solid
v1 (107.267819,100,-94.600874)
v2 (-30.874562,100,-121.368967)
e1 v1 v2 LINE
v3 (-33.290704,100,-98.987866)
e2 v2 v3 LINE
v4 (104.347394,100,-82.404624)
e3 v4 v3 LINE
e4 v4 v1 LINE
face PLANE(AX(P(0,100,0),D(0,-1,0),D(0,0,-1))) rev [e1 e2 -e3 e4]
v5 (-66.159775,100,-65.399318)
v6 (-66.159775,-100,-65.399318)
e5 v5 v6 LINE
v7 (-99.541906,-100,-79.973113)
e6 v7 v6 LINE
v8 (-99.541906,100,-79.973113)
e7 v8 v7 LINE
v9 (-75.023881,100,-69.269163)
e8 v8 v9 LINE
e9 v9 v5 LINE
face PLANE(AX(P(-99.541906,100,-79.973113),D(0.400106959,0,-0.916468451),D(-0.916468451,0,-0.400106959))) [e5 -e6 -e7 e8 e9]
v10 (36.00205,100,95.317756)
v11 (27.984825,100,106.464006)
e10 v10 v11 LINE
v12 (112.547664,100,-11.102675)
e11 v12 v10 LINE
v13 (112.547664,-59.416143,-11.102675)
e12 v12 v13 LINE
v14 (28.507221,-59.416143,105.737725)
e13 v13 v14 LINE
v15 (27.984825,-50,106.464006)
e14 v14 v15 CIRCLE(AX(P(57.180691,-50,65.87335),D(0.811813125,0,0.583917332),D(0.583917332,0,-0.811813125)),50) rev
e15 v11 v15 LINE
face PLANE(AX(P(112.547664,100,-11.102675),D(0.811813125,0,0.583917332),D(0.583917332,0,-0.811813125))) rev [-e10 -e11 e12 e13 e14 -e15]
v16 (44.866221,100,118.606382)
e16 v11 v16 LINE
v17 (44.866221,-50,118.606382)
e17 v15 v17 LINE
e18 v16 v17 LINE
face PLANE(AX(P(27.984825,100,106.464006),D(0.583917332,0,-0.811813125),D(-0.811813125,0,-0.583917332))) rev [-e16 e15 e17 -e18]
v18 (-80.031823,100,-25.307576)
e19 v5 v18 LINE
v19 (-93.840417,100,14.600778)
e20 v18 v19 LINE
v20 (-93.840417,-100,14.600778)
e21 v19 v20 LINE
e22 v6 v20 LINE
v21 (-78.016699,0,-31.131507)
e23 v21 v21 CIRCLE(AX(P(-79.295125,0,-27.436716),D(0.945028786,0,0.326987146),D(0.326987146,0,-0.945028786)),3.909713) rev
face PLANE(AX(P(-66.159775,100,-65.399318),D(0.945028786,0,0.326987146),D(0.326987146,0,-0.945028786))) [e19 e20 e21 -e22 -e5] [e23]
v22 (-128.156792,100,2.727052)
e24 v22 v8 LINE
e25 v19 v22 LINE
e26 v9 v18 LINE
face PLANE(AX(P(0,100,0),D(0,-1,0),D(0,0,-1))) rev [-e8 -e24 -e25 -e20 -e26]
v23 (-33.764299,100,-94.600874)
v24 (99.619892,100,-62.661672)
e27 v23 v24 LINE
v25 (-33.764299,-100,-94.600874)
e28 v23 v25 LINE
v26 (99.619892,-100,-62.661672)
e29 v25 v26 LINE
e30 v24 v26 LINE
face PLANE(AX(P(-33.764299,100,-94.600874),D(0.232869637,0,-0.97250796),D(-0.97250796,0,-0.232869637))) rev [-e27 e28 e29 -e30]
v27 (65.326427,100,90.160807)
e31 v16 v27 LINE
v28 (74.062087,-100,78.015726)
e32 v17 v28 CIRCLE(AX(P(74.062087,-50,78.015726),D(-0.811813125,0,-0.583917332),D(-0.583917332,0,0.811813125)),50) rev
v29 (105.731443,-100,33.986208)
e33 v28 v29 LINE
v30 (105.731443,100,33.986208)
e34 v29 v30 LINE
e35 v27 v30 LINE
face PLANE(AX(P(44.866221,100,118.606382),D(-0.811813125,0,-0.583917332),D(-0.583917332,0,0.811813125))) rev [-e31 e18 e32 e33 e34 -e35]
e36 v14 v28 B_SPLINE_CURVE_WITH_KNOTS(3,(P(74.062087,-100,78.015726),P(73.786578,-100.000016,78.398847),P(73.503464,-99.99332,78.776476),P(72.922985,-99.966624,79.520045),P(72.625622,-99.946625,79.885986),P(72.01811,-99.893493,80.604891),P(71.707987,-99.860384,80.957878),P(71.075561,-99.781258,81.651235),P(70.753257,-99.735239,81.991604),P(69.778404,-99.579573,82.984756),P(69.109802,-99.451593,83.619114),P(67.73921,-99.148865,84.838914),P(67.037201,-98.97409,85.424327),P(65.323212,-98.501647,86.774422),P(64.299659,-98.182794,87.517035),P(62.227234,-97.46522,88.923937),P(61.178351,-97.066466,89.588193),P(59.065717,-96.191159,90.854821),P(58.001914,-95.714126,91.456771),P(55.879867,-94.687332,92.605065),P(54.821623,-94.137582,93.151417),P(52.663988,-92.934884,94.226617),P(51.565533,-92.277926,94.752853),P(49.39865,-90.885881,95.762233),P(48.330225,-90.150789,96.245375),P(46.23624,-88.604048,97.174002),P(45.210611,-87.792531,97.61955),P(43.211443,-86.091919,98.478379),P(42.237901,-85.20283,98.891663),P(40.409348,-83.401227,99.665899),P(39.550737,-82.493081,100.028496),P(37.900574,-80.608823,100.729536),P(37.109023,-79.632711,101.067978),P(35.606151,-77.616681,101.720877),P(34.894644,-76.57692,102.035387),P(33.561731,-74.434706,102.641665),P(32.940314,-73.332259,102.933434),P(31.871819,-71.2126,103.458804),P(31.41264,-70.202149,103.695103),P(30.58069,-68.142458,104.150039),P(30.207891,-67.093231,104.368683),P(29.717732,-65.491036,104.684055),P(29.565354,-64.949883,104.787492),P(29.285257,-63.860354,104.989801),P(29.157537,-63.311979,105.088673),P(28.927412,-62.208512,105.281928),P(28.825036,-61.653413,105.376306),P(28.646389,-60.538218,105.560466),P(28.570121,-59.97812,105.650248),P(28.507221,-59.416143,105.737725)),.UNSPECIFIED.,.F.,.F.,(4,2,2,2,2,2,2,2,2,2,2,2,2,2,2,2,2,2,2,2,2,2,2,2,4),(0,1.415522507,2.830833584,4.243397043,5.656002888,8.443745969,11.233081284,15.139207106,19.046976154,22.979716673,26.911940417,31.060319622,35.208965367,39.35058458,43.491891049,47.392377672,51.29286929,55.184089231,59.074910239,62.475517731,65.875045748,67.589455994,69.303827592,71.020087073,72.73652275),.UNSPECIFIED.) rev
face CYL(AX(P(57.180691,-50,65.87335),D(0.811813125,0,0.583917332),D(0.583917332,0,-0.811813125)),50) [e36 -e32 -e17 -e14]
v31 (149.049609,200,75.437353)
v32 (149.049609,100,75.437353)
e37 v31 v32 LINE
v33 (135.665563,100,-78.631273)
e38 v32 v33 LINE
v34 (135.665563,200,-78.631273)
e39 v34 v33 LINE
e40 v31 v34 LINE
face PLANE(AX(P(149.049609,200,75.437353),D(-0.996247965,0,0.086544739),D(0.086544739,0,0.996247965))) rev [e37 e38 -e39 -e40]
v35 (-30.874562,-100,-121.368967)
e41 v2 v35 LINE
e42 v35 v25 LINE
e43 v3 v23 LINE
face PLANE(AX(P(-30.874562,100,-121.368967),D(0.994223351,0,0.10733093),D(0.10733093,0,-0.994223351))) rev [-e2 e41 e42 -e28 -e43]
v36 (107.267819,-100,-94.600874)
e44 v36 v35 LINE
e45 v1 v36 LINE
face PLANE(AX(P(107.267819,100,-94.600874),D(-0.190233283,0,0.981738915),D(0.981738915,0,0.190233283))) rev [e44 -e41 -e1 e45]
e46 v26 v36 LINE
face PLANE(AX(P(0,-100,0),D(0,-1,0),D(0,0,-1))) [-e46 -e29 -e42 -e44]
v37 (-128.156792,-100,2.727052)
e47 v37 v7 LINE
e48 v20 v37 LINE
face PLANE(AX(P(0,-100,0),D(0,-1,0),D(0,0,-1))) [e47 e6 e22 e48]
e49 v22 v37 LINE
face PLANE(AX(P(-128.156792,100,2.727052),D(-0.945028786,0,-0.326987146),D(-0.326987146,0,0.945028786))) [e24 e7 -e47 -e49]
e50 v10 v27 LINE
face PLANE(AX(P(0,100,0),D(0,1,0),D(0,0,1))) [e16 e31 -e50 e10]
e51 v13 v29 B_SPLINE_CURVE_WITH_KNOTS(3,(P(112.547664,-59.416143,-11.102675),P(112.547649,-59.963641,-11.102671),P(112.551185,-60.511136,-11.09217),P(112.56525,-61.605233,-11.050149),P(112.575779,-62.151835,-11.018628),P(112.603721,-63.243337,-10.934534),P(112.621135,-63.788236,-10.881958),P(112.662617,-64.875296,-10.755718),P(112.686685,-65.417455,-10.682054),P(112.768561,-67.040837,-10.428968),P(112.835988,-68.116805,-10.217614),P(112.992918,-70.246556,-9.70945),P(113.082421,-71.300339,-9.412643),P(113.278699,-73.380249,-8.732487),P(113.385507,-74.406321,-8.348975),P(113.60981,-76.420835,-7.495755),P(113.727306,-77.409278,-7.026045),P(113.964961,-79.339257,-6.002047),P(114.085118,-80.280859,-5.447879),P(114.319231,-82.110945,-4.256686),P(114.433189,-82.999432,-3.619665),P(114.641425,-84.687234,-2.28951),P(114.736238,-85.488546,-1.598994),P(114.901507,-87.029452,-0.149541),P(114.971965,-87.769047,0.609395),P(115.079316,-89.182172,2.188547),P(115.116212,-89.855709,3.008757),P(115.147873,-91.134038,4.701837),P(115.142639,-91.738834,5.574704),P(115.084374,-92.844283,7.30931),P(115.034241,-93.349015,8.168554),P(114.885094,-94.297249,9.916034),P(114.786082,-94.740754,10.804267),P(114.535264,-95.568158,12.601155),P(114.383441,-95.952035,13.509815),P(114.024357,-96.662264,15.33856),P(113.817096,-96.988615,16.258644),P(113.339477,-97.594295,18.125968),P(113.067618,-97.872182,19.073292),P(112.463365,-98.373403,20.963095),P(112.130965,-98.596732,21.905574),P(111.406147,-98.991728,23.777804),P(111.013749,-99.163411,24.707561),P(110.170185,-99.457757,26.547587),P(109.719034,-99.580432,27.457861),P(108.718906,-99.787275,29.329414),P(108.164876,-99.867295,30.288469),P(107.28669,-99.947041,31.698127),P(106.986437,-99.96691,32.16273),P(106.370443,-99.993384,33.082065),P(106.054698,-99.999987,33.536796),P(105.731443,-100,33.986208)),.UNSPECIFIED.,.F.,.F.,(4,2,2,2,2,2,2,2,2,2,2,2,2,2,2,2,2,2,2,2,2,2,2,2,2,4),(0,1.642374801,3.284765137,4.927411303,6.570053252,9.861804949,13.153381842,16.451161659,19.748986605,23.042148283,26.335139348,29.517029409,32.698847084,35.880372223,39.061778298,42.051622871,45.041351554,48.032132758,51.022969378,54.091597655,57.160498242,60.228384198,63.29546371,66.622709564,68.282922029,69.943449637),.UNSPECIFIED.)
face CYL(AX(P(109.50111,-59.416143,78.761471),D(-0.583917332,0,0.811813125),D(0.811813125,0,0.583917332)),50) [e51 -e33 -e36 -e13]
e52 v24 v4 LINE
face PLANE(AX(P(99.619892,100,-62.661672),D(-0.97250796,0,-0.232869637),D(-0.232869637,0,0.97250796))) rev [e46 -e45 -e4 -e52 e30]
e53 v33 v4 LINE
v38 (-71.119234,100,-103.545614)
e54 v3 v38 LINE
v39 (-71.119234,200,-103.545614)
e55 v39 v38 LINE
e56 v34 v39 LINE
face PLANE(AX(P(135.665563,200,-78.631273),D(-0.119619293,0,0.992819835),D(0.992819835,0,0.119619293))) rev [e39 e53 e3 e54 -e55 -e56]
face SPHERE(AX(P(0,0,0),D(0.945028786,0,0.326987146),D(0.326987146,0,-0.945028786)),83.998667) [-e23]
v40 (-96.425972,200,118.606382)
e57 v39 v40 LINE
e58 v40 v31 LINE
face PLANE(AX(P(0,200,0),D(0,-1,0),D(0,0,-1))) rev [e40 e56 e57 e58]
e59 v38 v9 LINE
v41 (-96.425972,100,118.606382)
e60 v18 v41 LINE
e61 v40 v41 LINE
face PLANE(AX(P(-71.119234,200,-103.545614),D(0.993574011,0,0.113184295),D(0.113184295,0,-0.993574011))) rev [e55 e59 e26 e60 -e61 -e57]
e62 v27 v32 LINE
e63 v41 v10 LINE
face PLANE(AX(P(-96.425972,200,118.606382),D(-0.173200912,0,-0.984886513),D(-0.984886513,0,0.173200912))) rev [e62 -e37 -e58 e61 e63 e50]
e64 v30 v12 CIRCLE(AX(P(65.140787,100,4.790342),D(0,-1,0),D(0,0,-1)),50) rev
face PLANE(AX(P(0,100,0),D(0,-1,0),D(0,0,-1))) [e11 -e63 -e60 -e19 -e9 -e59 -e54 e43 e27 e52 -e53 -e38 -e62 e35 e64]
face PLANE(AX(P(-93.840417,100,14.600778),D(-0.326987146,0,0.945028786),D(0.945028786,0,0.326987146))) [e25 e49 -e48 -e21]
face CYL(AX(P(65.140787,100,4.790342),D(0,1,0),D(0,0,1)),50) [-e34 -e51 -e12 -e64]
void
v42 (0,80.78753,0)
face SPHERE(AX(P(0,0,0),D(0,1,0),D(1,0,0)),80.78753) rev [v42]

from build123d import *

# Parameters (mm, degrees)
BOSS_EXTRUDE1_START = -100
BOSS_EXTRUDE1_DEPTH = 200
BOSS_EXTRUDE2_START = 100
BOSS_EXTRUDE2_DEPTH = 100
FILLET4_R           = 50
FILLET5_R           = 50


with BuildPart() as part:
    # Sketch2 → Revolve1 (revolve)
    with BuildSketch(Plane.XY):
        with BuildLine():
            Line((0, 83.99866675223616), (0, -83.99866675223616))
            ThreePointArc((0, -83.99866675223616), (-83.99866675223616, 1.029e-14), (0, 83.99866675223616))
        make_face()
    revolve(axis=Axis((0, 83.99866675223616, 0), (0, -1, 0)))

    # Sketch3 → Cut-Revolve1 (revolve, cut)
    with BuildSketch(Plane.XY):
        with BuildLine():
            Line((0, 80.78753047196574), (0, -80.78753047196574))
            ThreePointArc((0, -80.78753047196574), (-80.78753047196574, 9.89e-15), (0, 80.78753047196574))
        make_face()
    revolve(axis=Axis((0, 80.78753047196574, 0), (0, -1, 0)), mode=Mode.SUBTRACT)

    # Sketch4 → Boss-Extrude1 (add)
    with BuildSketch(Plane(origin=(0, 0, 0), x_dir=(1, 0, 0), z_dir=(0, 1, 0)).offset(BOSS_EXTRUDE1_START)):
        Polygon((112.54766400764188, 11.102674962916051), (27.984824564062315, -106.46400649371546), (44.86622080796269, -118.60638205853901), (131.25655362126273, 1.5010410793763536), align=None)
        Polygon((-33.76429920229263, 94.6008743415586), (99.61989179054804, 62.66167239344396), (107.26781928097456, 94.6008743415586), (-30.8745618831775, 121.36896740283562), align=None)
        Polygon((-66.15977546395177, 65.39931827471092), (-93.84041715231778, -14.600778033423827), (-128.15679158223395, -2.7270515196505585), (-99.54190589937616, 79.97311259674068), align=None)
    extrude(amount=BOSS_EXTRUDE1_DEPTH)


with BuildPart() as boss_extrude1_piece_1:
    # of the separate pieces the step leaves, piece 1, a body of its own (boss_extrude1_pieces)
    add(part.part.solids().sort_by_distance((0, -83.998666752, 0))[0])



with BuildPart() as boss_extrude1_piece_2:
    # of the separate pieces the step leaves, piece 2, a body of its own (boss_extrude1_pieces)
    add(part.part.solids().sort_by_distance((-33.764299202, -100, -94.600874342))[0])


with BuildPart() as boss_extrude1_piece_3:
    # of the separate pieces the step leaves, piece 3, a body of its own (boss_extrude1_pieces)
    add(part.part.solids().sort_by_distance((112.547664008, -100, -11.102674963))[0])


with BuildPart() as boss_extrude1_piece_1_1:
    add(boss_extrude1_piece_1.part)

    add(boss_extrude1_piece_2.part)  # Boss-Extrude2 merges Boss-Extrude1 piece 2

    add(boss_extrude1_piece_3.part)  # Boss-Extrude2 merges Boss-Extrude1 piece 3
    # Sketch4<3> → Boss-Extrude2 (add)
    with BuildSketch(Plane(origin=(0, 0, 0), x_dir=(1, 0, 0), z_dir=(0, 1, 0)).offset(BOSS_EXTRUDE2_START)):
        Polygon((-71.1192338079553, 103.5456135287754), (-96.42597159573657, -118.60638205853901), (149.04960909120163, -75.4373531726898), (135.6655625605631, 78.63127336750127), align=None)
    extrude(amount=BOSS_EXTRUDE2_DEPTH)

    # Fillet4
    # the kernel refuses this fillet: 50 mm, written as the material it takes off along each edge
    with BuildSketch(Plane(origin=(-73.49181604435654, -100, 33.47434002763414), x_dir=(2e-16, 1, -2.8e-16), z_dir=(0.8118131248673509, 0, 0.5839173317286507))) as fillet4_piece_1:
        with BuildLine():
            CenterArc((FILLET4_R, -FILLET4_R), FILLET4_R, 90.00000000000003, 89.99999999999997)
            Line((1.73e-14, -FILLET4_R), (-FILLET4_R * 0.02, -FILLET4_R))
            Line((-FILLET4_R * 0.02, -FILLET4_R), (-FILLET4_R * 0.02, FILLET4_R * 0.02))
            Line((-FILLET4_R * 0.02, FILLET4_R * 0.02), (FILLET4_R, FILLET4_R * 0.02))
            Line((FILLET4_R, FILLET4_R * 0.02), (FILLET4_R, 0))
        make_face()
    extrude(amount=270.79468257754365, mode=Mode.SUBTRACT)
    with BuildSketch(Plane(origin=(171.7917074692354, -100, -93.46894402013166), x_dir=(0, 1, 0), z_dir=(-0.5839173317286501, 0, 0.8118131248673512))) as fillet4_piece_2:
        with BuildLine():
            CenterArc((40.583856818365355, -50), FILLET4_R, 90, 54.26011731322143)
            Line((0, -20.794682577543853), (-0.8116771363673081, -20.21057622909473))
            ThreePointArc((-0.8116771363673081, -20.21057622909473), (-1, -10.397341288771914), (-1, -6.48e-15))
            Line((-1, -6.48e-15), (0, 1.0000000000000047))
            Line((0, 1.0000000000000047), (40.583856818365355, 0.9999999999999881))
            Line((40.583856818365355, 0.9999999999999881), (40.583856818365355, 0))
        make_face()
    extrude(amount=347.739166716712, mode=Mode.SUBTRACT)

    # Fillet5
    # the kernel refuses this fillet: 50 mm, written as the material it takes off along each edge
    with BuildSketch(Plane(origin=(131.25655362126273, -209.28392328582004, -1.50104107937635), x_dir=(-0.8896758585741418, 0, -0.4565926704080605), z_dir=(0, 1, 0))) as fillet5_piece_1:
        with BuildLine():
            CenterArc((55.94900253333829, 35.785265930590285), FILLET5_R, 171.4409151223373, 54.26011731322126)
            Line((6.5058569003557185, 43.22672747491594), (5.516993987696065, 43.37555670580245))
            Line((5.516993987696065, 43.37555670580245), (-0.9888629126596437, 0.1488292308865173))
            Line((-0.9888629126596437, 0.1488292308865173), (-9.07e-15, -1.0000000000000053))
            ThreePointArc((-9.07e-15, -1.0000000000000053), (10.514441542566455, -0.9999999999999917), (20.330480696168753, -0.7157053186118065))
            Line((20.330480696168753, -0.7157053186118065), (21.02888308513286, 9.6e-16))
        make_face()
    extrude(amount=309.28392328582004, mode=Mode.SUBTRACT)


solid = boss_extrude1_piece_1_1.part
